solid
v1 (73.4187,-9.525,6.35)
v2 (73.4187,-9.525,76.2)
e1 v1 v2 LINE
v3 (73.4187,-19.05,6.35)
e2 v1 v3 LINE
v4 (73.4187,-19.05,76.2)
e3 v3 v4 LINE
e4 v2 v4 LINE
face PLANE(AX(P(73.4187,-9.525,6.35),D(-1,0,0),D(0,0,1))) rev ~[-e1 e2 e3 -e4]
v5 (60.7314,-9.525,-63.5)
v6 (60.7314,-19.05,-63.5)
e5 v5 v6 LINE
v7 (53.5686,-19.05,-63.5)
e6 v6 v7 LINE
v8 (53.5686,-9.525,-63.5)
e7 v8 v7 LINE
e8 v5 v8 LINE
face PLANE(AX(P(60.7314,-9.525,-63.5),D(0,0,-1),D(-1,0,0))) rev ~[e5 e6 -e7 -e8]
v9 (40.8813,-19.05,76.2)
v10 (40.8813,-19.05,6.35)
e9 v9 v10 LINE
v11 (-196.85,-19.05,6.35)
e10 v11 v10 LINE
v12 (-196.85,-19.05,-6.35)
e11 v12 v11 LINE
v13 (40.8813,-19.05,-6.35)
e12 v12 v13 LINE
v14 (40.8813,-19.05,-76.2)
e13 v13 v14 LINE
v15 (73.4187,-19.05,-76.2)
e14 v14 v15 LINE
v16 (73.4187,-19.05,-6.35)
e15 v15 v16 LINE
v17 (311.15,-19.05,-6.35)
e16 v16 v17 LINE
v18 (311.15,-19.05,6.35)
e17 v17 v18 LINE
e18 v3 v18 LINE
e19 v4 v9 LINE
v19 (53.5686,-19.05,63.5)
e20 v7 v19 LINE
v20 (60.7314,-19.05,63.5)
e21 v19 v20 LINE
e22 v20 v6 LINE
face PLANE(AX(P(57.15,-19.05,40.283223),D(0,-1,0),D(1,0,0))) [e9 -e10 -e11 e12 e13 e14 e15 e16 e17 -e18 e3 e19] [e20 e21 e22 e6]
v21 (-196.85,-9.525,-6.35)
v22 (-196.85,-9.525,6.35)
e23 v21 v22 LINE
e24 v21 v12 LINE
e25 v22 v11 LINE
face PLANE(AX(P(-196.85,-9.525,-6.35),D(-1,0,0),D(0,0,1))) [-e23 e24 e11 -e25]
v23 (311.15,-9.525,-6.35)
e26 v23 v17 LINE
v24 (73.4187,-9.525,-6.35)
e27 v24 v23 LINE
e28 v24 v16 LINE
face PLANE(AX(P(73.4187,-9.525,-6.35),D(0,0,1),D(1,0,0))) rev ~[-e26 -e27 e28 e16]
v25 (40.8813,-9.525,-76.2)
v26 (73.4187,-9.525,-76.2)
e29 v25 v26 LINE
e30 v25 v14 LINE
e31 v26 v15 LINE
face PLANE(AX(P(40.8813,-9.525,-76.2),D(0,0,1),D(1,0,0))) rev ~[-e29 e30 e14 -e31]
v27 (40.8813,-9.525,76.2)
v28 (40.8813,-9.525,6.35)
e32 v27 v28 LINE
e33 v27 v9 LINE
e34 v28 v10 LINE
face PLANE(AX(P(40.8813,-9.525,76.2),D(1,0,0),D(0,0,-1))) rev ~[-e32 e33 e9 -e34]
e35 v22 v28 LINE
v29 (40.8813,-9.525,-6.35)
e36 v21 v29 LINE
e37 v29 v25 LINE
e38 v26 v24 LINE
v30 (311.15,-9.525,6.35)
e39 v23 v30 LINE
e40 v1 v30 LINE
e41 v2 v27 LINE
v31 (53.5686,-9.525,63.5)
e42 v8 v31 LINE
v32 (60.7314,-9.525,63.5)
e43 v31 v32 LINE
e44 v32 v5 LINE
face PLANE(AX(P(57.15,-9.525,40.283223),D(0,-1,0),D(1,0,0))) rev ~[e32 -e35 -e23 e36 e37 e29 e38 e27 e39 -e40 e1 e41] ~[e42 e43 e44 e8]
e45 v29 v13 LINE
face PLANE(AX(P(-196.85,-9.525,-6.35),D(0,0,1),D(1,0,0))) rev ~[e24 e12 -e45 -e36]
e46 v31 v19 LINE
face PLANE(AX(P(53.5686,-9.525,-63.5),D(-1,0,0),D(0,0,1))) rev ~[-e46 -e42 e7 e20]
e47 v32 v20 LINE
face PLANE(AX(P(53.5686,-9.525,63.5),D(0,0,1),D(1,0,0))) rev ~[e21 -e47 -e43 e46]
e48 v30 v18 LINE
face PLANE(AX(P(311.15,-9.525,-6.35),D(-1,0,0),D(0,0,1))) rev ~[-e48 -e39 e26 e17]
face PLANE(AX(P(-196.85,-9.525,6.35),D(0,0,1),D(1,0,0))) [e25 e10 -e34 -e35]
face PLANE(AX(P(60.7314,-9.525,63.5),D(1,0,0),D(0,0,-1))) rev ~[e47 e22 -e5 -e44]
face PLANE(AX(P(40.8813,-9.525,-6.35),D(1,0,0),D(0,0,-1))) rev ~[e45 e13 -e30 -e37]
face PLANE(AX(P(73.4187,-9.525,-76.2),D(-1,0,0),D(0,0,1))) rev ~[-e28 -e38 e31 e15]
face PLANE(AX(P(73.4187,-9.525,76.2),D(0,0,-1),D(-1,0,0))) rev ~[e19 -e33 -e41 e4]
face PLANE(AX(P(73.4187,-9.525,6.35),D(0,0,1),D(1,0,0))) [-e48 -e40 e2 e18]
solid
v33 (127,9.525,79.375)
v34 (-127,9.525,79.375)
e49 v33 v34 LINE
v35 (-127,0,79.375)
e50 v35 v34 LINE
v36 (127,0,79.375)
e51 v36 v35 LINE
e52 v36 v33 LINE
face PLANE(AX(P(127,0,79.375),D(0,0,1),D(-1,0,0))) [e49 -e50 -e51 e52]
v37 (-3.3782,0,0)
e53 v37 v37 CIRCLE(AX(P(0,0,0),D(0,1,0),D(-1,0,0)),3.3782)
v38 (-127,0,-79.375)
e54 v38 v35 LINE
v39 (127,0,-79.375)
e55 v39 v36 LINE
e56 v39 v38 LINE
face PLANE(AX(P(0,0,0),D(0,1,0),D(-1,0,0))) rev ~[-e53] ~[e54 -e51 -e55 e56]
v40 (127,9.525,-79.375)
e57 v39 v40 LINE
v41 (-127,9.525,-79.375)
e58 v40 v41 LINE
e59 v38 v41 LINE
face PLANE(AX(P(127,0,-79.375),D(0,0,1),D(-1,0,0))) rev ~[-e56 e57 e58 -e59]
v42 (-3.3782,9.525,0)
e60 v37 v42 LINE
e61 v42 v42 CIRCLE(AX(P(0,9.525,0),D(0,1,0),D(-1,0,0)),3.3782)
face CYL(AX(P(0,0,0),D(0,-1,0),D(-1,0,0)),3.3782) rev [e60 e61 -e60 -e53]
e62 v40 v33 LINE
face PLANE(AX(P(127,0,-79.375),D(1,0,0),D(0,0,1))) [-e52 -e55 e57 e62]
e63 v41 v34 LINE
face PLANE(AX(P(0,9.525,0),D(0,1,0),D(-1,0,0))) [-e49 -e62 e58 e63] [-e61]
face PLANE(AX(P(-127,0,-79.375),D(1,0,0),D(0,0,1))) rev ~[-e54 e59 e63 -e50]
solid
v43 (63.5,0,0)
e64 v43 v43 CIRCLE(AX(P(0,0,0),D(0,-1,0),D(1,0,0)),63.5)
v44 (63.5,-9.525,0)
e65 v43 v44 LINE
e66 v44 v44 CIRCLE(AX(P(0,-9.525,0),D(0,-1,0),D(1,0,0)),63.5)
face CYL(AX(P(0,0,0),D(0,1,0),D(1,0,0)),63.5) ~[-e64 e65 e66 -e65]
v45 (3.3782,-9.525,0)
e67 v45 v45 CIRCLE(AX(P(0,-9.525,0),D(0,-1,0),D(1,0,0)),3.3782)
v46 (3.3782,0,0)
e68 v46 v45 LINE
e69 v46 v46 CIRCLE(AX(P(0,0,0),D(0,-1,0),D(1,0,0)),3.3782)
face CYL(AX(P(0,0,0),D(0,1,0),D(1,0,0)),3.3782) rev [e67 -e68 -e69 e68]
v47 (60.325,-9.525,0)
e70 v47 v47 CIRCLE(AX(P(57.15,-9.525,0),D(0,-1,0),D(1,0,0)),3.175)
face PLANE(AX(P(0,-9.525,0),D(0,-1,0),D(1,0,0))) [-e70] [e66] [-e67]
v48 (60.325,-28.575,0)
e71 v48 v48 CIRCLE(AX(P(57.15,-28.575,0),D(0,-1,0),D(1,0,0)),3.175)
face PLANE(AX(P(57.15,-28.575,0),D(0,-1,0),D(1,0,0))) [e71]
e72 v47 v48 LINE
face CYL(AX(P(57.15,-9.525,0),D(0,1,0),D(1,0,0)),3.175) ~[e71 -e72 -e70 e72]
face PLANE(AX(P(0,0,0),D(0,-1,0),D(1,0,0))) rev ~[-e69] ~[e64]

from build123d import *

# Parameters (mm, degrees)
F1_R     = 63.5
F1_R_2   = 3.3782
F2_DEPTH = 9.525
F3_R     = 3.175
F4_DEPTH = 19.05
F3_W     = 12.6873
F3_H     = 12.7
F3_W_2   = 237.7313
F5_DEPTH = 9.525
F6_W     = 254
F6_H     = 158.75
F6_R     = 63.5
F6_R_2   = 3.3782
F7_DEPTH = 9.525


with BuildPart() as f2:
    # F1 (on Front) → F2 (new body)
    with BuildSketch(Plane.XZ):
        Circle(F1_R)
        Circle(F1_R_2, mode=Mode.SUBTRACT)
    extrude(amount=F2_DEPTH)

    # F3 (on face) → F4 (join)
    with BuildSketch(Plane.XZ.offset(9.525)):
        with Locations((57.15, 0)):
            Circle(F3_R)
    extrude(amount=F4_DEPTH)


with BuildPart() as f5:
    # F3 (on face) → F5 (new body)
    with BuildSketch(Plane.XZ.offset(9.525)):
        Polygon((53.5686, 6.35), (53.5686, 63.5), (60.7314, 63.5), (60.7314, 6.35), (73.4187, 6.35), (73.4187, 76.2), (40.8813, 76.2), (40.8813, 6.35), align=None)
        with Locations((47.22495, 0)):
            Rectangle(F3_W, F3_H)
        with Locations((67.07505, 0)):
            Rectangle(F3_W, F3_H)
        Polygon((53.5686, -63.5), (53.5686, -6.35), (40.8813, -6.35), (40.8813, -76.2), (73.4187, -76.2), (73.4187, -6.35), (60.7314, -6.35), (60.7314, -63.5), align=None)
        with Locations((-77.98435, 0)):
            Rectangle(F3_W_2, F3_H)
        with Locations((192.28435, 0)):
            Rectangle(F3_W_2, F3_H)
    extrude(amount=F5_DEPTH)


with BuildPart() as f7:
    # F6 (on face) → F7 (new body)
    with BuildSketch(Plane(origin=(0, 0, 0), x_dir=(-1, 0, 0), z_dir=(0, 1, 0))):
        Rectangle(F6_W, F6_H)
        Circle(F6_R, mode=Mode.SUBTRACT)
        Circle(F6_R)
        Circle(F6_R_2, mode=Mode.SUBTRACT)
    extrude(amount=F7_DEPTH)


solid = Compound([f2.part, f5.part, f7.part])
